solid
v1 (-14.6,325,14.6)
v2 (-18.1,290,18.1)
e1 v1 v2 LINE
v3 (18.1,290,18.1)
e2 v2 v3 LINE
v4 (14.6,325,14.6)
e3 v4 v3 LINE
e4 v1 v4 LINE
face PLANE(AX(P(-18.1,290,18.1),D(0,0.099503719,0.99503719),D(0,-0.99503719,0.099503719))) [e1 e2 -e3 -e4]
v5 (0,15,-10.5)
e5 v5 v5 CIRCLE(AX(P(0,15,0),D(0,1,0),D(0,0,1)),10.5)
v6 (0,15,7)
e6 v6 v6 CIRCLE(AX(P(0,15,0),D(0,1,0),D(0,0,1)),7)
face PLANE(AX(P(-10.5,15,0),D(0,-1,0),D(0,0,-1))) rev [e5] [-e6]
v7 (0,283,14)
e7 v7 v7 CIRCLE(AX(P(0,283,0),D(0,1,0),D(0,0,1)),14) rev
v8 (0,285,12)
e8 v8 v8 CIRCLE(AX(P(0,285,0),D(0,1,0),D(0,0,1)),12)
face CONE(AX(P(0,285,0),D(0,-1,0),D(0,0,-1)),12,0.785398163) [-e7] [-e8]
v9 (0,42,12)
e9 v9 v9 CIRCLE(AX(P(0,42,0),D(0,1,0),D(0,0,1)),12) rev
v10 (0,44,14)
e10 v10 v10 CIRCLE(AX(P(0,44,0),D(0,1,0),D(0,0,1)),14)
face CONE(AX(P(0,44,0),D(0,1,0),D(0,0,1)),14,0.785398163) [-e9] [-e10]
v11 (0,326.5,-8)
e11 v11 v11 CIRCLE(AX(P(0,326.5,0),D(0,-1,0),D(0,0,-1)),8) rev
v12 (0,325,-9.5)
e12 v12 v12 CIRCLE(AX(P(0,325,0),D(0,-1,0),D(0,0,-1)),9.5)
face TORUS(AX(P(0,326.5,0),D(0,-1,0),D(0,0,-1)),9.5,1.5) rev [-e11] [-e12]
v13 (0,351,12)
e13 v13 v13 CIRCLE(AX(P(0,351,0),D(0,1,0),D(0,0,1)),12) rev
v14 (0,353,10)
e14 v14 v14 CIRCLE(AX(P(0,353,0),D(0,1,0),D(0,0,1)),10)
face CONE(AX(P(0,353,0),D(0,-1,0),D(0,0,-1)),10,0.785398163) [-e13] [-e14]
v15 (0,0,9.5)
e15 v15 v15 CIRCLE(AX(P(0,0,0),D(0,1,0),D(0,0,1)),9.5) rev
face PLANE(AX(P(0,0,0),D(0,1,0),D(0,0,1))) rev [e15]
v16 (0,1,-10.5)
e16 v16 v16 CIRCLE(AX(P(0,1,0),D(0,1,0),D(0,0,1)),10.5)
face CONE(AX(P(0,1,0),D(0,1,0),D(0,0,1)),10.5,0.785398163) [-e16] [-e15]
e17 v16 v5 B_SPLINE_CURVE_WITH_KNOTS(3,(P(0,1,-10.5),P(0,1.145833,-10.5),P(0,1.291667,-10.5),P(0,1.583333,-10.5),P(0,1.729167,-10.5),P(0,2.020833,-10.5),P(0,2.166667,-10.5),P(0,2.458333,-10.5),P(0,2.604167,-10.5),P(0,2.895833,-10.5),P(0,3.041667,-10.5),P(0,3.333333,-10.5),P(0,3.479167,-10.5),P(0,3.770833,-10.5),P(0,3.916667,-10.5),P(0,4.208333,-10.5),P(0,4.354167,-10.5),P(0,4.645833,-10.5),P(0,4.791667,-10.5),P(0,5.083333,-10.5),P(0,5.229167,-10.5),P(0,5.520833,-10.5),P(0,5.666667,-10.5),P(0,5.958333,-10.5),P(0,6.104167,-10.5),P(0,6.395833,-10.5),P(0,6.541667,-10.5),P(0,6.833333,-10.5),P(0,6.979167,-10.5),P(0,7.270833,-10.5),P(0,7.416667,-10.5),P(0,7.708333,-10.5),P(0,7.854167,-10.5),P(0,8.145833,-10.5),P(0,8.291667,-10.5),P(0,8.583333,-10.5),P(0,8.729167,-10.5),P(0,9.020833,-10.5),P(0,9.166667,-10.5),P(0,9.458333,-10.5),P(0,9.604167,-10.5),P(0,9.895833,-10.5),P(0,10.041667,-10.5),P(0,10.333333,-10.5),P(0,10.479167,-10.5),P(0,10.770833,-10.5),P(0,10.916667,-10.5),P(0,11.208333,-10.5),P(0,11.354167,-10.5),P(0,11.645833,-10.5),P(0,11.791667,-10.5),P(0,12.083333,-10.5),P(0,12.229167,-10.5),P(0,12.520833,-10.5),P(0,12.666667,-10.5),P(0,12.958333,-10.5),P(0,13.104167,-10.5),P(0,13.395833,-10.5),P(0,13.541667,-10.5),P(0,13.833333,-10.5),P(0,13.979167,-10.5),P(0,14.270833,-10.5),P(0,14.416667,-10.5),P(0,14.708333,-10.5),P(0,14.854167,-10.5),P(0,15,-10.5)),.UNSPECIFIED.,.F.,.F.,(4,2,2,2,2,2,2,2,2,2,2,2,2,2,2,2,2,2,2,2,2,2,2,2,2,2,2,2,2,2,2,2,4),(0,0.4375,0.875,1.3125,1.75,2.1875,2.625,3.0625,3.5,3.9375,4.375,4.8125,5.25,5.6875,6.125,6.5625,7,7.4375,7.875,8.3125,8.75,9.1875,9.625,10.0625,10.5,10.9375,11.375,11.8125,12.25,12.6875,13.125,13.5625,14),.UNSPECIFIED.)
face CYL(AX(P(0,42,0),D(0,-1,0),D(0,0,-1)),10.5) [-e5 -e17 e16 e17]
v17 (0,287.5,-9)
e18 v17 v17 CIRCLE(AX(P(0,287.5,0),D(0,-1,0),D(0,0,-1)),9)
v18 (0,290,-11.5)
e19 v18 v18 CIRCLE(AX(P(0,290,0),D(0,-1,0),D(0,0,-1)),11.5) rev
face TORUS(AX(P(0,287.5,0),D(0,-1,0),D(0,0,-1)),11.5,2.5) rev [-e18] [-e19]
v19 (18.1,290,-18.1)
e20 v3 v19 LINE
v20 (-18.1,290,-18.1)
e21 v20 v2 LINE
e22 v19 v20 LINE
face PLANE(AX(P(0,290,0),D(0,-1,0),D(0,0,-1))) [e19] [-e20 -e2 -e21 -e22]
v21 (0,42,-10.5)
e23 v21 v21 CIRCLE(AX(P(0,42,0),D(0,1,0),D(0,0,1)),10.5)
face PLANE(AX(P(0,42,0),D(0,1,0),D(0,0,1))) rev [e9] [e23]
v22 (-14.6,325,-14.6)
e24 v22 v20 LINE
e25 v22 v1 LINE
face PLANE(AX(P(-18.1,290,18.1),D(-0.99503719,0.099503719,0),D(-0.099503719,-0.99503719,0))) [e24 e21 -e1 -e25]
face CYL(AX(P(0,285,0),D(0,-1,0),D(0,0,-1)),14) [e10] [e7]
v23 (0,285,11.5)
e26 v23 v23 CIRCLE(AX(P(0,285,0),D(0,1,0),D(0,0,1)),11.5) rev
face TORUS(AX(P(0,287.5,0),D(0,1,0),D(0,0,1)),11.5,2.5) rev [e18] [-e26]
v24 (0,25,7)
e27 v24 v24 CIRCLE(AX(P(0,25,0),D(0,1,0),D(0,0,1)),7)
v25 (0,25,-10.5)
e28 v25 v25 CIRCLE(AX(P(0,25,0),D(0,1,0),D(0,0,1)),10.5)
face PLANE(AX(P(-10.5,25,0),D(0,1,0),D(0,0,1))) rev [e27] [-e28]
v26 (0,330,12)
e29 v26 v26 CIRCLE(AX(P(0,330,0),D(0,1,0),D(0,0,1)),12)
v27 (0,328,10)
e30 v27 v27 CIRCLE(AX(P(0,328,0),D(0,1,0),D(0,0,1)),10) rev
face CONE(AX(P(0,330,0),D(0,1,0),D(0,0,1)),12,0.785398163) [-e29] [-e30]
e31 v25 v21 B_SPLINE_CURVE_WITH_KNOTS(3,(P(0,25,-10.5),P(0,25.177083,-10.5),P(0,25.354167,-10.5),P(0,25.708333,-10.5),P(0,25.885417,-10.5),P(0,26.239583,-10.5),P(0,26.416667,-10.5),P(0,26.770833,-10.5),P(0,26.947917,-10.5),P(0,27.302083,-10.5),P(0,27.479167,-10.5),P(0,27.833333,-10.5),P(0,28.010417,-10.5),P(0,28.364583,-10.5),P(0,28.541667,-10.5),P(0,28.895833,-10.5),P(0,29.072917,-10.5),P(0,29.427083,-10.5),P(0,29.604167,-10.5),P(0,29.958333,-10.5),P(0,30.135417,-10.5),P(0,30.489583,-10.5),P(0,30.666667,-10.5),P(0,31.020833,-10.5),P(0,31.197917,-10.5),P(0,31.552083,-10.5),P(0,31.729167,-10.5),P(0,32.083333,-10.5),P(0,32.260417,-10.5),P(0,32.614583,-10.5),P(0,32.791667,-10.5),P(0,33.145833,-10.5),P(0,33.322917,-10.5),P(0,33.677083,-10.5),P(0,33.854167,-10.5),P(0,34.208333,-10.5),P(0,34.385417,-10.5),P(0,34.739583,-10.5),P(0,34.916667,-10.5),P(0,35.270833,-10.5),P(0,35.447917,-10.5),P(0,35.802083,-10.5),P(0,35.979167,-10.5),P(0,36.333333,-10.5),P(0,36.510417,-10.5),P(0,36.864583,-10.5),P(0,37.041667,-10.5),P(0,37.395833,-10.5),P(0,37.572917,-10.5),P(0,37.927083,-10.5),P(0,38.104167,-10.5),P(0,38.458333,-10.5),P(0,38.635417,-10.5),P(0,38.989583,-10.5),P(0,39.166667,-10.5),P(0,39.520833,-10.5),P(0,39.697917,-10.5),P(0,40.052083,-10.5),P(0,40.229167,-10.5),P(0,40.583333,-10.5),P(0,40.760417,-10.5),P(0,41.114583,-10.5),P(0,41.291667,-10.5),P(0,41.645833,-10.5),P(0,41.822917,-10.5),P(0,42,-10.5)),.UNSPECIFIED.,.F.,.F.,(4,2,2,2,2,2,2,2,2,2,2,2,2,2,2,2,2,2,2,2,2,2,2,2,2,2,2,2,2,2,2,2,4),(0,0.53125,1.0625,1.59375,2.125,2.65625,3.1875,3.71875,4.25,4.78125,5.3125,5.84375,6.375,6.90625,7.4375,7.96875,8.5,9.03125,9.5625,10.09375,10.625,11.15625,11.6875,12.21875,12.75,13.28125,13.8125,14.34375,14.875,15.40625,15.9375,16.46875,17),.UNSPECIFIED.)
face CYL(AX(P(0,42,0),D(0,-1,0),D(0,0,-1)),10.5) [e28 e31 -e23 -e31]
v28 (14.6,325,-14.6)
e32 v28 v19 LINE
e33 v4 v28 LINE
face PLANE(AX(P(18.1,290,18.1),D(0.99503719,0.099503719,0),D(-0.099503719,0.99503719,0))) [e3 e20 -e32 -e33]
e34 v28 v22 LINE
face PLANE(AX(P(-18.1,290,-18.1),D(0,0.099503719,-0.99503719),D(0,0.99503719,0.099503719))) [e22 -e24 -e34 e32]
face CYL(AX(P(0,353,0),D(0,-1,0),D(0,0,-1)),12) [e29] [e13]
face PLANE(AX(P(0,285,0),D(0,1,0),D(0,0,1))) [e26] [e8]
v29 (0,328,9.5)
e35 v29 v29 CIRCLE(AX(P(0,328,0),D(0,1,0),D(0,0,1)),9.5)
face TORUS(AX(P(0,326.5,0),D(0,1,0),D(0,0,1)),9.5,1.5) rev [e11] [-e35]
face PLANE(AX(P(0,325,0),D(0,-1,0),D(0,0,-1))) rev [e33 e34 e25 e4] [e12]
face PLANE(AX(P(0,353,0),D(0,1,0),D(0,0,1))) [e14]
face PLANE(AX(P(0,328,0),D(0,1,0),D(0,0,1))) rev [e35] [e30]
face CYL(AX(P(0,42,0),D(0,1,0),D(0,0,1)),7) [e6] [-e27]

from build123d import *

# Parameters (mm, degrees)
SKETCH1_R           = 10.5
BOSS_EXTRUDE1_DEPTH = 42
SKETCH3_R           = 14
BOSS_EXTRUDE2_DEPTH = 243
SKETCH4_R           = 9
BOSS_EXTRUDE3_DEPTH = 5
SKETCH5_W           = 36.2
SKETCH5_H           = 36.2
BOSS_EXTRUDE4_DEPTH = 35
BOSS_EXTRUDE4_TAPER = 5.710593137
SKETCH6_R           = 8
BOSS_EXTRUDE6_DEPTH = 3
SKETCH7_R           = 12
BOSS_EXTRUDE7_DEPTH = 25
CHAMFER1_SIZE       = 2
FILLET2_R           = 2.5
SKETCH8_W           = 3.5
SKETCH8_H           = 10
CHAMFER2_SIZE       = 2
CHAMFER3_SIZE       = 1
FILLET3_R           = 1.5


with BuildPart() as part:
    # Sketch1 → Boss-Extrude1 (new body)
    with BuildSketch(Plane(origin=(0, 0, 0), x_dir=(1, 0, 0), z_dir=(0, 1, 0))):
        with Locations(Location((0, 0, 0), (0, 0, 90))):
            Circle(SKETCH1_R)
    extrude(amount=BOSS_EXTRUDE1_DEPTH)

    # Sketch3 → Boss-Extrude2 (add)
    with BuildSketch(Plane(origin=(0, 42, 0), x_dir=(1, 0, 0), z_dir=(0, 1, 0))):
        with Locations(Location((0, 0, 0), (0, 0, 270))):
            Circle(SKETCH3_R)
    extrude(amount=BOSS_EXTRUDE2_DEPTH)

    # Sketch4 → Boss-Extrude3 (add)
    with BuildSketch(Plane(origin=(0, 285, 0), x_dir=(1, 0, 0), z_dir=(0, 1, 0))):
        with Locations(Location((0, 0, 0), (0, 0, 270))):
            Circle(SKETCH4_R)
    extrude(amount=BOSS_EXTRUDE3_DEPTH)

    # Sketch5 → Boss-Extrude4 (add)
    with BuildSketch(Plane(origin=(0, 290, 0), x_dir=(1, 0, 0), z_dir=(0, 1, 0))):
        Rectangle(SKETCH5_W, SKETCH5_H)
    extrude(amount=BOSS_EXTRUDE4_DEPTH, taper=BOSS_EXTRUDE4_TAPER)

    # Sketch6 → Boss-Extrude6 (add)
    with BuildSketch(Plane(origin=(0, 325, 0), x_dir=(1, 0, 0), z_dir=(0, 1, 0))):
        with Locations(Location((0, 0, 0), (0, 0, 270))):
            Circle(SKETCH6_R)
    extrude(amount=BOSS_EXTRUDE6_DEPTH)

    # Sketch7 → Boss-Extrude7 (add)
    with BuildSketch(Plane(origin=(0, 328, 0), x_dir=(1, 0, 0), z_dir=(0, 1, 0))):
        with Locations(Location((0, 0, 0), (0, 0, 270))):
            Circle(SKETCH7_R)
    extrude(amount=BOSS_EXTRUDE7_DEPTH)

    # Chamfer1
    chamfer1_edges = [part.edges().sort_by_distance(p)[0] for p in [
        (0, 328, -12),
        (0, 353, -12),
    ]]
    chamfer(chamfer1_edges, length=CHAMFER1_SIZE)

    # Fillet2
    fillet2_edges = [part.edges().sort_by_distance(p)[0] for p in [
        (0, 290, -9),
        (0, 285, -9),
    ]]
    fillet(fillet2_edges, radius=FILLET2_R - 0.0001)  # a hair under: the kernel refuses the full size

    # Sketch8 → Cut-Revolve1 (revolve, cut)
    with BuildSketch(Plane.XY, mode=Mode.PRIVATE) as cut_revolve1_sk:
        with Locations((-8.75, 20)):
            Rectangle(SKETCH8_W, SKETCH8_H)
    revolve(cut_revolve1_sk.sketch.rotate(Axis((0, 42, 0), (0, -1, 0)), 90), axis=Axis((0, 42, 0), (0, -1, 0)), mode=Mode.SUBTRACT)

    # Chamfer2
    chamfer2_edges = [part.edges().sort_by_distance(p)[0] for p in [
        (0, 42, -14),
        (0, 285, -14),
    ]]
    chamfer(chamfer2_edges, length=CHAMFER2_SIZE)

    # Chamfer3
    chamfer3_edges = [part.edges().sort_by_distance(p)[0] for p in [
        (0, 0, 10.5),
    ]]
    chamfer(chamfer3_edges, length=CHAMFER3_SIZE)

    # Fillet3
    fillet3_edges = [part.edges().sort_by_distance(p)[0] for p in [
        (0, 325, -8),
        (0, 328, -8),
    ]]
    fillet(fillet3_edges, radius=FILLET3_R - 0.0001)  # a hair under: the kernel refuses the full size


solid = part.part
